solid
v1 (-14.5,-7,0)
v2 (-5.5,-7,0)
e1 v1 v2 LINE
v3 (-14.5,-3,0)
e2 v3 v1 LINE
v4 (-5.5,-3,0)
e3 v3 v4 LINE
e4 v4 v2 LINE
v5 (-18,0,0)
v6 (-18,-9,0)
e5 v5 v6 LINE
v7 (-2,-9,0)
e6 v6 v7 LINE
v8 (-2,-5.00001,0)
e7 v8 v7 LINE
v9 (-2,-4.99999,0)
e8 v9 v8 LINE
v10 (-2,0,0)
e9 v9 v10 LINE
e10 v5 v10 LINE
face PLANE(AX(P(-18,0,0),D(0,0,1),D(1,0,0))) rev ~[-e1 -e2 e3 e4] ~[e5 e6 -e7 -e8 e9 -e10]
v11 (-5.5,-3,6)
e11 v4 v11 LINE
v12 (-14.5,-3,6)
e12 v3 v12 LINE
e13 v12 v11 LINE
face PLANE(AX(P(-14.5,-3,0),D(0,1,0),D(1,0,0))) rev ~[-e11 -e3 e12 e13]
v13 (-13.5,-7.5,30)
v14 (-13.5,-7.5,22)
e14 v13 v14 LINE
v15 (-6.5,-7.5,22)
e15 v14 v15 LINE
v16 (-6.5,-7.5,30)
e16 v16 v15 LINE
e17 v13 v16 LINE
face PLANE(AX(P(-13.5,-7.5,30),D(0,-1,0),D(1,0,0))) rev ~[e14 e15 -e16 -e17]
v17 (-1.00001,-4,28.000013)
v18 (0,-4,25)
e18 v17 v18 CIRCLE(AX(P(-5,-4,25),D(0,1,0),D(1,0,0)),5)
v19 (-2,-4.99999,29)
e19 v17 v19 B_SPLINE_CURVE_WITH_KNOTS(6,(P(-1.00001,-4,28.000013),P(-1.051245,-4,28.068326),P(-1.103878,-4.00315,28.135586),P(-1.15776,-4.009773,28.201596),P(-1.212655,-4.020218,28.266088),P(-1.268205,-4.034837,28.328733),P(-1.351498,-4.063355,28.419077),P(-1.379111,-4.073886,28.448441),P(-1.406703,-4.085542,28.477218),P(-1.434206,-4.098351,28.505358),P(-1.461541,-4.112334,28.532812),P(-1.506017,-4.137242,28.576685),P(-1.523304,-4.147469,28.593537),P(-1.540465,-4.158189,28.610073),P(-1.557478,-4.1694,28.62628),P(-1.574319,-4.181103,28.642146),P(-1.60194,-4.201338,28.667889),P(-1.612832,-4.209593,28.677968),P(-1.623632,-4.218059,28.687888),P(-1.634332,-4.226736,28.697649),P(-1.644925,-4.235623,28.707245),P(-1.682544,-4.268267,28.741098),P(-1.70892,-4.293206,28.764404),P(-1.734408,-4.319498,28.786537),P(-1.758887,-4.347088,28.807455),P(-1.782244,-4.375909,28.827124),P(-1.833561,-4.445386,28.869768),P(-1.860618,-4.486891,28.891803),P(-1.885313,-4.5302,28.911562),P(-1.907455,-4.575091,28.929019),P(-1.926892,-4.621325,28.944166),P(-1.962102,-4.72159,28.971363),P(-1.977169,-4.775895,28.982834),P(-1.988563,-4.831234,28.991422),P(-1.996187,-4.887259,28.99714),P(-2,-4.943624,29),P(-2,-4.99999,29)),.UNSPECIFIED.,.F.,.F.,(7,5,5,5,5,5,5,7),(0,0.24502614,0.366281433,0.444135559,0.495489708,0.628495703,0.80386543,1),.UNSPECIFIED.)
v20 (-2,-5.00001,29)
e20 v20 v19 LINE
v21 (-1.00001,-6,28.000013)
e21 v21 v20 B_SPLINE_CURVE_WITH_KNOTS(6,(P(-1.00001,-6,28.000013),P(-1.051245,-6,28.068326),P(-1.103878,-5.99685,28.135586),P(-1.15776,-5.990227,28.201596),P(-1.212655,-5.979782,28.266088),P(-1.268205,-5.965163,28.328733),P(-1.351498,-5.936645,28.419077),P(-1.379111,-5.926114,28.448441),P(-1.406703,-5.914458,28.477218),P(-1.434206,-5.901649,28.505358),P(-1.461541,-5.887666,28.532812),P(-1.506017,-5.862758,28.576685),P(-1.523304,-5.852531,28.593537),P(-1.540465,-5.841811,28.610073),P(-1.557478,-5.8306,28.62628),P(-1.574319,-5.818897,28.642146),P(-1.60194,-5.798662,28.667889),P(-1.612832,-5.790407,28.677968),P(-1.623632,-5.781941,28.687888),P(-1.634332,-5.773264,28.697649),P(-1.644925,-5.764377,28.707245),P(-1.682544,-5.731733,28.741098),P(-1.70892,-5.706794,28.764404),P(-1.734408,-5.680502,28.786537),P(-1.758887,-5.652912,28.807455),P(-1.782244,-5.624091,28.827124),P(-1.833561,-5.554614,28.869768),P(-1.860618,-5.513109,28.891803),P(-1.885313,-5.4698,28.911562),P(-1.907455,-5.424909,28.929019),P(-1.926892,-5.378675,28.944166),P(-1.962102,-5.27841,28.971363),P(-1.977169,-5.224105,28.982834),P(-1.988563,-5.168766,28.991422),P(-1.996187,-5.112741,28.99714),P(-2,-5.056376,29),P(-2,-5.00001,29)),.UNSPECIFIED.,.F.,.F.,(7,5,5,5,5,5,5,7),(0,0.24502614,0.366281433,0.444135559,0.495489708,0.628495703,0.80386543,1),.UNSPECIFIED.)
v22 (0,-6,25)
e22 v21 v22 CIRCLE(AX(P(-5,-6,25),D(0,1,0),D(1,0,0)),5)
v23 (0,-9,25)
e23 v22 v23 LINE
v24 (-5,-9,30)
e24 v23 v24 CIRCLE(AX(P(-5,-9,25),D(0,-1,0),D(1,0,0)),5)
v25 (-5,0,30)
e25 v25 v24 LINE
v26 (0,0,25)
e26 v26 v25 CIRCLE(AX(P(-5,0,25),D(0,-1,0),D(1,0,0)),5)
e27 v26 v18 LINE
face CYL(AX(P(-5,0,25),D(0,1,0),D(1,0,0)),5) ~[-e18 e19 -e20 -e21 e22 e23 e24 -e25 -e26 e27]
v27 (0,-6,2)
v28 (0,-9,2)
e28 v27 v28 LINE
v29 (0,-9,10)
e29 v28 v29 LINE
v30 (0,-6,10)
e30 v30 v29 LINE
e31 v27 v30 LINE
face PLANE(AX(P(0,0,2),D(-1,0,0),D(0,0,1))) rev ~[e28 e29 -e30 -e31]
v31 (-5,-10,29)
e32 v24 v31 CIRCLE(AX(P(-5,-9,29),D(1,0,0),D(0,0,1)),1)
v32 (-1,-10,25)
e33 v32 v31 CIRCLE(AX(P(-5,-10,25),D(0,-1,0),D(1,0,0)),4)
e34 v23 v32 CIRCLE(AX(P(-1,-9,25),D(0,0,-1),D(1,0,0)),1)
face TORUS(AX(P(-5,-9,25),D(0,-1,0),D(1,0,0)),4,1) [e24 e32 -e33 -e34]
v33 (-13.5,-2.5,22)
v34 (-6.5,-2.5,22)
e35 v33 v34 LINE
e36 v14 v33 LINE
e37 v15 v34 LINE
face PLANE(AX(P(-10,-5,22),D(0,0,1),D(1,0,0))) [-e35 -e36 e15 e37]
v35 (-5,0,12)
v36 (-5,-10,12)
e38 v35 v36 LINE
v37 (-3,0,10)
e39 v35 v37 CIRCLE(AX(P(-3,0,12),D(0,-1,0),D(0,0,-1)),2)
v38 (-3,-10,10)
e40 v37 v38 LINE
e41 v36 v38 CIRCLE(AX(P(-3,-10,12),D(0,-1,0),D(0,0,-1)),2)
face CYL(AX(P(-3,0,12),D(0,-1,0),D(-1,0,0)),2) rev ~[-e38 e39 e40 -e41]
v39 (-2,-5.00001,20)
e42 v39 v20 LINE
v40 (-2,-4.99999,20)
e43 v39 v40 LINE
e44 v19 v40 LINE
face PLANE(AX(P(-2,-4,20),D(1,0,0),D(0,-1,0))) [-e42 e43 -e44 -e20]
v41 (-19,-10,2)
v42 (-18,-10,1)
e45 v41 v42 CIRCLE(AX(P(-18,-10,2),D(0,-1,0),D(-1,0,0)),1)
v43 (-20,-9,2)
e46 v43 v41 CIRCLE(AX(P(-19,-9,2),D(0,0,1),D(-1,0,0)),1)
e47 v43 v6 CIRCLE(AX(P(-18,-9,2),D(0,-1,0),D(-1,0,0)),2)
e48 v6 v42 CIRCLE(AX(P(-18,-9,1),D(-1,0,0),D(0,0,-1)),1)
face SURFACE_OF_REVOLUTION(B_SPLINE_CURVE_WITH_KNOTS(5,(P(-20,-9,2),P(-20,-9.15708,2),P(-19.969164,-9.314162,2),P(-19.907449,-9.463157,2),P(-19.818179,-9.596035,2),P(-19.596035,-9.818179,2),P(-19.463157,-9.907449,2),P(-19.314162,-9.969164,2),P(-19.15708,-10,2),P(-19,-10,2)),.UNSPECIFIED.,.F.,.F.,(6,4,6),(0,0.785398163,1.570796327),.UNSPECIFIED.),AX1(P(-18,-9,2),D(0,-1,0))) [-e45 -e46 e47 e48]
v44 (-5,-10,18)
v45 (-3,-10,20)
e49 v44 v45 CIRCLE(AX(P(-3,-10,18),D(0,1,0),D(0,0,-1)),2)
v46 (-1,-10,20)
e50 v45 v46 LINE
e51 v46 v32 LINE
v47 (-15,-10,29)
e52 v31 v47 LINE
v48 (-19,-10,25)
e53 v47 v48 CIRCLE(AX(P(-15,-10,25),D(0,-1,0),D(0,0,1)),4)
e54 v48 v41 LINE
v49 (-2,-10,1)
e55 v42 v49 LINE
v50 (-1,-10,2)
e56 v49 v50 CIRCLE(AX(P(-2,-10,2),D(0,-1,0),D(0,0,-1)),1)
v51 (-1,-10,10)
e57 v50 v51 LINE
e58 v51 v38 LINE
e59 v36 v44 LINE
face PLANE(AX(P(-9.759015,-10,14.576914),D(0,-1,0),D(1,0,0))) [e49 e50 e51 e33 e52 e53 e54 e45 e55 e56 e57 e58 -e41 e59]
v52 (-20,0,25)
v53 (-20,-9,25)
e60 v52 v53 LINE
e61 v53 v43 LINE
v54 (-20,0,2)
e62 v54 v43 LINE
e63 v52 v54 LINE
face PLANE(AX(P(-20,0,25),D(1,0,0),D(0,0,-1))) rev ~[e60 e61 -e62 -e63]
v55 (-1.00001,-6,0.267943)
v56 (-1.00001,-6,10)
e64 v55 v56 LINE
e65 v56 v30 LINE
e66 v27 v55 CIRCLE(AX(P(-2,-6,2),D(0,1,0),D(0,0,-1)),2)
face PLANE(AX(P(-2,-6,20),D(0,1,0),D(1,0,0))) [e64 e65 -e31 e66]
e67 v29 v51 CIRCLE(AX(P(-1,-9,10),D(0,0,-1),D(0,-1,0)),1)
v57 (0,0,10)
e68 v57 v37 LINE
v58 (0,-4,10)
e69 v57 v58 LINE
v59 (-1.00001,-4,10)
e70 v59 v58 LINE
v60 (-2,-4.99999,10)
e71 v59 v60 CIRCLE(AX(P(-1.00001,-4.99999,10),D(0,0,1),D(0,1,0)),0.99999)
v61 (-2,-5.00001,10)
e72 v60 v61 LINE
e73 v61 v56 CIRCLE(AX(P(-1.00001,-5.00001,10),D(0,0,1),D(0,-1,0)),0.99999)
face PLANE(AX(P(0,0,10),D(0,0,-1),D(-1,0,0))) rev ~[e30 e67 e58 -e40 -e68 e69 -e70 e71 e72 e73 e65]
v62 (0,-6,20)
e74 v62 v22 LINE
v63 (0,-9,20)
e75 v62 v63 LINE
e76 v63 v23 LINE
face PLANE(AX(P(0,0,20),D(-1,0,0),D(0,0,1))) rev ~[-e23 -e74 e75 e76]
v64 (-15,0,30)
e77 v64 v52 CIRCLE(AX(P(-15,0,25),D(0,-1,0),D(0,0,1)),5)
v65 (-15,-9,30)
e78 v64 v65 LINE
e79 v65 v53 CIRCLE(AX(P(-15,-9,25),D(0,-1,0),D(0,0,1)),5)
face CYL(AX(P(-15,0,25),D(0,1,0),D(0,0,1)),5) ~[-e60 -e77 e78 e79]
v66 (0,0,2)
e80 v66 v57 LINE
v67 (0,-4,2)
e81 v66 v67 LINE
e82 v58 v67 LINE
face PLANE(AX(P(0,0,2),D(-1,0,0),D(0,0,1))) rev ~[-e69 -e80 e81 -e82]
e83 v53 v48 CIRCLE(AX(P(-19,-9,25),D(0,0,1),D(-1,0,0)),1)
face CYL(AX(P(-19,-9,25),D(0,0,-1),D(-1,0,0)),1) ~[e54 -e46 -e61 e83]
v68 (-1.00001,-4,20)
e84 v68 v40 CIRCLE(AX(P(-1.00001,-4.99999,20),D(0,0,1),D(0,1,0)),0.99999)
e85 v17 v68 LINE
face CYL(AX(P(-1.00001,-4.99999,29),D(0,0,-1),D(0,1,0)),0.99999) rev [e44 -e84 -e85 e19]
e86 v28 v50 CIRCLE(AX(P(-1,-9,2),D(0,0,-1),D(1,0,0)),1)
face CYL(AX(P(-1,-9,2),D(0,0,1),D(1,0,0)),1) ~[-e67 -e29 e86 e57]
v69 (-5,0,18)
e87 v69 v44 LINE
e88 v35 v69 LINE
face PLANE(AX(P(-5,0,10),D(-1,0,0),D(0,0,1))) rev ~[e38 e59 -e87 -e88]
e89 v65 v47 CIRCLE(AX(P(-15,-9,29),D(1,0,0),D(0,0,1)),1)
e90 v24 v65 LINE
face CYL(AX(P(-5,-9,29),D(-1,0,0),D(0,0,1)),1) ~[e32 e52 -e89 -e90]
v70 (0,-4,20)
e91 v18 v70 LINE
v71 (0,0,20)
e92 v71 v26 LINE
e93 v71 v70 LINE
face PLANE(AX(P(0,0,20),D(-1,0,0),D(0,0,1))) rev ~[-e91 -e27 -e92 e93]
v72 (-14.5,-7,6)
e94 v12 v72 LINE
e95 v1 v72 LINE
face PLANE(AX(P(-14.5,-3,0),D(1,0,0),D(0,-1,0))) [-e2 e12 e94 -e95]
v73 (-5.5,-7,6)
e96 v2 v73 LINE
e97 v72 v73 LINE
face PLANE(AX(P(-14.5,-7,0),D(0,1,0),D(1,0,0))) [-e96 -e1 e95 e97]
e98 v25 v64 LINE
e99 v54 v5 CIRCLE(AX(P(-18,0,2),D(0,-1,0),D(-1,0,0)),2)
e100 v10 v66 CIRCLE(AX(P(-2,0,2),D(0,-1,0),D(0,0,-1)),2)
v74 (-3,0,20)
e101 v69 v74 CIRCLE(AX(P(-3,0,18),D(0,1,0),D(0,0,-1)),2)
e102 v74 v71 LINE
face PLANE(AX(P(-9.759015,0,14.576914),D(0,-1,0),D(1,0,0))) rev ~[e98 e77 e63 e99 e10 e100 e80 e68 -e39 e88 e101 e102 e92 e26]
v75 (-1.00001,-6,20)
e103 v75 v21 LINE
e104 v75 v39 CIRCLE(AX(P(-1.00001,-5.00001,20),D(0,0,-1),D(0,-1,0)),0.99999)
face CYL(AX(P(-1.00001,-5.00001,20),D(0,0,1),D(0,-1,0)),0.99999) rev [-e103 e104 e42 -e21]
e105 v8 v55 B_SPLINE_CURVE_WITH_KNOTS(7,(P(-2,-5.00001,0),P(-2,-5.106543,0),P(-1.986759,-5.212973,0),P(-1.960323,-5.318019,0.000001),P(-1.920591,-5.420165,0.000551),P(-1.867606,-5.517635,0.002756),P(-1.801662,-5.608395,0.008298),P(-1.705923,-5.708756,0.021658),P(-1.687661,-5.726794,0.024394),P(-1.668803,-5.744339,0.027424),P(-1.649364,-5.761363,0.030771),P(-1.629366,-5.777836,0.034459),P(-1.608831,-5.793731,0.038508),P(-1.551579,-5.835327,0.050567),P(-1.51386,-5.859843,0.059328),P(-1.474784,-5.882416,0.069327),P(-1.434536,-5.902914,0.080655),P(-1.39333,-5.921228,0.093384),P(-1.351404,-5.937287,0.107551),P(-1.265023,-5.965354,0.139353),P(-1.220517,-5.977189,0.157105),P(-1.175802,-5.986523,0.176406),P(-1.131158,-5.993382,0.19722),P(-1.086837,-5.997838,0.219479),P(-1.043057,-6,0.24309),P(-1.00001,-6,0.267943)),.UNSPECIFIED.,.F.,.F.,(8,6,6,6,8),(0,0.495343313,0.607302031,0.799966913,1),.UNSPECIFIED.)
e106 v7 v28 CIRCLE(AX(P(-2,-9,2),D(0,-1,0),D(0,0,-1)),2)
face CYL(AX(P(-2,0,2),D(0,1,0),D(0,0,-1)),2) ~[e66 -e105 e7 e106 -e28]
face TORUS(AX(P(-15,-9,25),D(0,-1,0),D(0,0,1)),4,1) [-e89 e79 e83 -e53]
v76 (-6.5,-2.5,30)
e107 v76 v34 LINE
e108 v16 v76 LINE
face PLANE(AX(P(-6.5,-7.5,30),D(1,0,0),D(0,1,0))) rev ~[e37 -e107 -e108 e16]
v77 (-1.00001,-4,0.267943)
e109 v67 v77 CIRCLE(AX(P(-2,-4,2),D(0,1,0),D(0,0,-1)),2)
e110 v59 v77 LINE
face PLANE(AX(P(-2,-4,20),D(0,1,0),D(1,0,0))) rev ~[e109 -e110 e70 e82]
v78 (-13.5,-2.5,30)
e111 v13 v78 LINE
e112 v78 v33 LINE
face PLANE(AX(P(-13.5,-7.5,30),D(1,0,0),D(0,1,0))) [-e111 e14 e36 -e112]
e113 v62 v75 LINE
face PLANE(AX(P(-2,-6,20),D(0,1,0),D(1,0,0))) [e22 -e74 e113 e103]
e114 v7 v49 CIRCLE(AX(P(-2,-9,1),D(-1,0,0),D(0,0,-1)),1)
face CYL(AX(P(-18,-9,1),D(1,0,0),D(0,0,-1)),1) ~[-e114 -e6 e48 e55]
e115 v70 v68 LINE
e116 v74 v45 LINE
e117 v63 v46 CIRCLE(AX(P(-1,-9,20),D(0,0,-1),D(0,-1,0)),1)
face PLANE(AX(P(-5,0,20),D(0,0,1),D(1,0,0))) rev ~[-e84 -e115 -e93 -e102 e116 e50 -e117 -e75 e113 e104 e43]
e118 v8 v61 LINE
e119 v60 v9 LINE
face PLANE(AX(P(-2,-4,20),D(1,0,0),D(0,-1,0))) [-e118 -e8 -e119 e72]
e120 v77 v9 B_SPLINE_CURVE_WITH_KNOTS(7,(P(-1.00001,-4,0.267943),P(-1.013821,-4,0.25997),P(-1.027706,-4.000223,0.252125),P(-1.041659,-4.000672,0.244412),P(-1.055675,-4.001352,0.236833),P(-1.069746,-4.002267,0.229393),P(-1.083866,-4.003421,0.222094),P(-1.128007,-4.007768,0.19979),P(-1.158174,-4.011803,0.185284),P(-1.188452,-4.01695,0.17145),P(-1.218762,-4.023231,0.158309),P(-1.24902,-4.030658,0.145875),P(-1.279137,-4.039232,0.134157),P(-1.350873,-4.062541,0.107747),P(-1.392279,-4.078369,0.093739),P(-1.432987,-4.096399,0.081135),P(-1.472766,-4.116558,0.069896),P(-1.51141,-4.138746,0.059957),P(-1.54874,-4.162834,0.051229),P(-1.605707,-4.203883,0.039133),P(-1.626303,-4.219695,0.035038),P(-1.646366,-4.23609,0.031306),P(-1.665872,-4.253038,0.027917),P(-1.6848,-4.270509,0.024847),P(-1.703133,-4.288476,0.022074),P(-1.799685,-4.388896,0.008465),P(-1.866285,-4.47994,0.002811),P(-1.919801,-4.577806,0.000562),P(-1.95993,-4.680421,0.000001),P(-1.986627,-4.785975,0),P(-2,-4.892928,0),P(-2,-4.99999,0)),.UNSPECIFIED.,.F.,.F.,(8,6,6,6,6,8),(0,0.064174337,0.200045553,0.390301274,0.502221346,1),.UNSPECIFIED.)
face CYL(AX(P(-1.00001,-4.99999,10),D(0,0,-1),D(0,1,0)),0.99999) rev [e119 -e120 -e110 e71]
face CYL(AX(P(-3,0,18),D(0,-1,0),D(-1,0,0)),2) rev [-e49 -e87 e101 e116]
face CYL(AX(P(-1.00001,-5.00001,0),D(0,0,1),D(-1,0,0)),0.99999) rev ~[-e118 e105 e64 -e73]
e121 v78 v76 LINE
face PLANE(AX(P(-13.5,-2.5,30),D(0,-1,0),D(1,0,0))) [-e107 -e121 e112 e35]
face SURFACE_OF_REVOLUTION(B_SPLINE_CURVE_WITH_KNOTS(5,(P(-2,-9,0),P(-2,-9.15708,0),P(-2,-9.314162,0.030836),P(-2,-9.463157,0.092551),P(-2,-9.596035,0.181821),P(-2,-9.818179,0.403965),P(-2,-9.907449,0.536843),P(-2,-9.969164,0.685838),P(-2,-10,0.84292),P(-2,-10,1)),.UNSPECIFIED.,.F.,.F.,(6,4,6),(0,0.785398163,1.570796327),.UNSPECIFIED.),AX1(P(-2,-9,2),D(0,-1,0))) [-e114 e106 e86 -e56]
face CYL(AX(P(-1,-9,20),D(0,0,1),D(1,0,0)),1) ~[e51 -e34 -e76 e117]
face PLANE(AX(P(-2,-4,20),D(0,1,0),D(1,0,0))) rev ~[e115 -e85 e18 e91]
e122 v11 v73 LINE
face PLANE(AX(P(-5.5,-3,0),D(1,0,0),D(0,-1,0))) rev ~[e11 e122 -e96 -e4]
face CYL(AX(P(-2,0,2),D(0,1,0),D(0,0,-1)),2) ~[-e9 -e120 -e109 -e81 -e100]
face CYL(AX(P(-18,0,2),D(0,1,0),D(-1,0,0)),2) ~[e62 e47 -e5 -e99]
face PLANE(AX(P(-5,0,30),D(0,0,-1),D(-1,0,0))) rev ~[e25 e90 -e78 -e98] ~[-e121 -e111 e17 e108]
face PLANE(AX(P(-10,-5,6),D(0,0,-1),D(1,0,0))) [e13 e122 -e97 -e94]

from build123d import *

# Parameters (mm, degrees)
F1_DEPTH  = 10
F2_R      = 1
F3_W      = 2
F3_H      = 2
F4_DEPTH  = 20
F5_R      = 2
F6_R      = 2
F7_W      = 7
F7_H      = 5
F8_DEPTH  = 8
F9_R      = 0.99999
F10_W     = 9
F10_H     = 4
F11_DEPTH = 6


# Not quite as in the source:
# - a fillet or chamfer is up to 0.001 mm smaller than in the source, because OpenCascade refuses the exact size


with BuildPart() as f1:
    # F0 (on Front) → F1 (new body)
    with BuildSketch(Plane.XZ):
        with BuildLine():
            Line((-18, 0), (-2, 0))
            ThreePointArc((-2, 0), (-0.5857864376, 0.5857864376), (0, 2))
            Line((0, 2), (0, 10))
            Line((0, 10), (-5, 10))
            Line((-5, 10), (-5, 20))
            Line((-5, 20), (0, 20))
            Line((0, 20), (0, 25))
            ThreePointArc((0, 25), (-1.4644660941, 28.5355339059), (-5, 30))
            Line((-5, 30), (-15, 30))
            ThreePointArc((-15, 30), (-18.5355339059, 28.5355339059), (-20, 25))
            Line((-20, 25), (-20, 2))
            ThreePointArc((-20, 2), (-19.4142135624, 0.5857864376), (-18, 0))
        make_face()
    extrude(amount=F1_DEPTH)

    # F2
    f2_edges = [f1.edges().sort_by_distance(p)[0] for p in [
        (-10, -10, 30),
    ]]
    fillet(f2_edges, radius=F2_R)

    # F3 (on face) → F4 (cut, symmetric)
    with BuildSketch(Plane(origin=(0, 0, 20), x_dir=(1, 0, 0), z_dir=(0, 0, -1))):
        with Locations((-1, 5)):
            Rectangle(F3_W, F3_H)
    extrude(amount=F4_DEPTH, both=True, mode=Mode.SUBTRACT)

    # F5
    f5_edges = [f1.edges().sort_by_distance(p)[0] for p in [
        (-5, -5, 20),
    ]]
    fillet(f5_edges, radius=F5_R)

    # F6
    f6_edges = [f1.edges().sort_by_distance(p)[0] for p in [
        (-5, -5, 10),
    ]]
    fillet(f6_edges, radius=F6_R)

    # F7 (on face) → F8 (cut)
    with BuildSketch(Plane.XY.offset(30)):
        with Locations((-10, -5)):
            Rectangle(F7_W, F7_H)
    extrude(amount=-F8_DEPTH, mode=Mode.SUBTRACT)

    # F9 (radius 1 in the source; OpenCascade refuses exactly that, so slightly less here)
    f9_edges = [f1.edges().sort_by_distance(p)[0] for p in [
        (-2, -4, 24.5),
        (-2, -6, 24.5),
        (-2, -6, 5),
        (-2, -4, 5),
    ]]
    fillet(f9_edges, radius=F9_R)

    # F10 (on face) → F11 (cut)
    with BuildSketch(Plane(origin=(0, 0, 0), x_dir=(1, 0, 0), z_dir=(0, 0, -1))):
        with Locations((-10, 5)):
            Rectangle(F10_W, F10_H)
    extrude(amount=-F11_DEPTH, mode=Mode.SUBTRACT)


solid = f1.part
